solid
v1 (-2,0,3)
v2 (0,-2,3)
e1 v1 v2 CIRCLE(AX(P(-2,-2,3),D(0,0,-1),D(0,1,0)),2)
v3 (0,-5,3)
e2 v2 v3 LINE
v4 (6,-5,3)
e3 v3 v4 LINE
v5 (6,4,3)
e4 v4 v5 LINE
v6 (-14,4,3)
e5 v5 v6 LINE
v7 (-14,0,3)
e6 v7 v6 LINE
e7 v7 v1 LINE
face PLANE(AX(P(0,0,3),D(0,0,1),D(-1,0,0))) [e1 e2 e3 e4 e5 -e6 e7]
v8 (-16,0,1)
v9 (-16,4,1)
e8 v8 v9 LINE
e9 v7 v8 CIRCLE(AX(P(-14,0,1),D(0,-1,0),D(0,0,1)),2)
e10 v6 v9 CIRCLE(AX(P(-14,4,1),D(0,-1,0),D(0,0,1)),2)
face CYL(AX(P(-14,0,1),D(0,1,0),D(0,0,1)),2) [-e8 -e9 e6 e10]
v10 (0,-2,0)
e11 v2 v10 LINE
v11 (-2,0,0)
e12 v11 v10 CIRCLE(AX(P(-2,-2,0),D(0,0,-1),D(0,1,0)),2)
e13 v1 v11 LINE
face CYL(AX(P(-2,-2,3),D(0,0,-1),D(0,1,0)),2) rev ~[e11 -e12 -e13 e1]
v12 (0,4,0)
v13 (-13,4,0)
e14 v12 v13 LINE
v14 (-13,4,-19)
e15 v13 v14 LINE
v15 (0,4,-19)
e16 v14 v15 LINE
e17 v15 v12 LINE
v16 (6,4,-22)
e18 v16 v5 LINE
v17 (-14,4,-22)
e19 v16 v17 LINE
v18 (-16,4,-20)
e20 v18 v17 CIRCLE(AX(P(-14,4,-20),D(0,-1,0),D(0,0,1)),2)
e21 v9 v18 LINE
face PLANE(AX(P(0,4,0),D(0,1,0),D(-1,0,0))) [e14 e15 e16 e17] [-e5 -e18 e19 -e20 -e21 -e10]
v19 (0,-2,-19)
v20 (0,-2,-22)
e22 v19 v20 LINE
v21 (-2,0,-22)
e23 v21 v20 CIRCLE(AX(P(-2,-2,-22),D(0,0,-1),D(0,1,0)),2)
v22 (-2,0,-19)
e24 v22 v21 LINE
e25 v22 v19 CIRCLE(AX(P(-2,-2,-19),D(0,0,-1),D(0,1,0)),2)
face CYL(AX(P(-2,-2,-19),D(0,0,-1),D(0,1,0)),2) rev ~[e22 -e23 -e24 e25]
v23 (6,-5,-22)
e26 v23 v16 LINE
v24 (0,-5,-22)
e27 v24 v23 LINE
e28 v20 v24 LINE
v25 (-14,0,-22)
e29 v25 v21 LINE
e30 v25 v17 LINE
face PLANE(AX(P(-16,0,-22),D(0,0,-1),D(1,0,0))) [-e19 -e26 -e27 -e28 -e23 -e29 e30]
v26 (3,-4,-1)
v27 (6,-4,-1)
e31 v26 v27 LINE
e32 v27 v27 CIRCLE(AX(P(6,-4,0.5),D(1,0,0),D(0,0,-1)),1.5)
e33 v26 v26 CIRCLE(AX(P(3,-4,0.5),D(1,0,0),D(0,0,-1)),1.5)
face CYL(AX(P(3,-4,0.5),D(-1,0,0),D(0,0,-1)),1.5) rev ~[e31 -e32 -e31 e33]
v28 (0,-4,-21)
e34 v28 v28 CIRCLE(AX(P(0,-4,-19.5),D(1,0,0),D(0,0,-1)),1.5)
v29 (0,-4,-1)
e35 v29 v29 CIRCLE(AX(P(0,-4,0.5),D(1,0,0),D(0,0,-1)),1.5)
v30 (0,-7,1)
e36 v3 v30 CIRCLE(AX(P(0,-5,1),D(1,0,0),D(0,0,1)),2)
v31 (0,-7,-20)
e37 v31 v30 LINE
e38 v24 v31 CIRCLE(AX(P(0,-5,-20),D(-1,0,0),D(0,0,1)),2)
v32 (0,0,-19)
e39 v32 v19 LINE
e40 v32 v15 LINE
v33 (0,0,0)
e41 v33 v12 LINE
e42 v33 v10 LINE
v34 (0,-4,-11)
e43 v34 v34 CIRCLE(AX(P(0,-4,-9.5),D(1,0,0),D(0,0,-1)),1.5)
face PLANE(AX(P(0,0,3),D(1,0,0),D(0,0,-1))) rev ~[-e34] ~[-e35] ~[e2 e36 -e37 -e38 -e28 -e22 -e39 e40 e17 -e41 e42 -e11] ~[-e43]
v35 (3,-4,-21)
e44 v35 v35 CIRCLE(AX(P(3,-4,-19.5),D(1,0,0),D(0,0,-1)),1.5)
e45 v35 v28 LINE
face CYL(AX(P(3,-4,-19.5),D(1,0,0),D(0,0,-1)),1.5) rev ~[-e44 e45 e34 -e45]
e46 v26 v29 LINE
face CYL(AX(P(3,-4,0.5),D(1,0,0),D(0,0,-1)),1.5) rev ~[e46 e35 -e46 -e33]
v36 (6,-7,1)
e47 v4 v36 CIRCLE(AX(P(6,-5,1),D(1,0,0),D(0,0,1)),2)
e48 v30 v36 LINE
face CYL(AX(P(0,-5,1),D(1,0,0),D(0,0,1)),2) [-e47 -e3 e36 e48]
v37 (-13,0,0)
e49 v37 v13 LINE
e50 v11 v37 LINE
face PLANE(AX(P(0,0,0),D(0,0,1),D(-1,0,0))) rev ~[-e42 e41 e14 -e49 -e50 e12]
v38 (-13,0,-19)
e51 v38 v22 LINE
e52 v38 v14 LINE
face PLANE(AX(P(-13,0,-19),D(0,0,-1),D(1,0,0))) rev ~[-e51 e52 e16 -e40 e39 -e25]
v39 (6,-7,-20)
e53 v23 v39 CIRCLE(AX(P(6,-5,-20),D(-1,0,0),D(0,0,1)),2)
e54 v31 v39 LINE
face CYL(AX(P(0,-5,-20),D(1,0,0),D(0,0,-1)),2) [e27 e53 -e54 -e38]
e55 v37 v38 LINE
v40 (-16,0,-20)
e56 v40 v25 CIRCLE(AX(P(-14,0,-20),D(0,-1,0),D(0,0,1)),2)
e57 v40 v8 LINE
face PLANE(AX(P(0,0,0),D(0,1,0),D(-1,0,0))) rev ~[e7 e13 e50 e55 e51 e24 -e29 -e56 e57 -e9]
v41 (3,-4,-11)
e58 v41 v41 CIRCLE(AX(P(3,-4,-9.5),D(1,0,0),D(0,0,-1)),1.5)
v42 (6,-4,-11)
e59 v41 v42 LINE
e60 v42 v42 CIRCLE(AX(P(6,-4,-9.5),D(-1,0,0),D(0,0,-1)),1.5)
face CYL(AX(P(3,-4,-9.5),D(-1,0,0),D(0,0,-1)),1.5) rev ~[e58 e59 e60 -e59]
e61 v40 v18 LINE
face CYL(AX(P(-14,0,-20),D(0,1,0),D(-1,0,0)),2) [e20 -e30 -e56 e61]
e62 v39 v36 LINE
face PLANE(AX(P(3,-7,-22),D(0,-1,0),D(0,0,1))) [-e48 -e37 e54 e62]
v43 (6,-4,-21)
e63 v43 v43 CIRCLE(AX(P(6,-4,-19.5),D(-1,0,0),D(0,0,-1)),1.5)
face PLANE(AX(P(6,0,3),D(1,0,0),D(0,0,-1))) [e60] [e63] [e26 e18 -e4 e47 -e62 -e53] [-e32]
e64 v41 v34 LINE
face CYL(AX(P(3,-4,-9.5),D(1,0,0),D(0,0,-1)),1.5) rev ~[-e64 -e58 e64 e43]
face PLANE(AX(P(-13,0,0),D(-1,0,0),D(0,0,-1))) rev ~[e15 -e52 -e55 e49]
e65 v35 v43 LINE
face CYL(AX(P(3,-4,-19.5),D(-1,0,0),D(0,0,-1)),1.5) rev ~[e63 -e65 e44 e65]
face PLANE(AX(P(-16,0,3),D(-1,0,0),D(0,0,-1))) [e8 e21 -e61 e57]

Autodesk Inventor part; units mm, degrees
ref_plane "YZ Plane" through (0, 0, 0) normal (1, 0, 0) x (0, 1, 0)
ref_plane "XZ Plane" through (0, 0, 0) normal (0, 1, 0) x (-1, 0, 0)
ref_plane "XY Plane" through (0, 0, 0) normal (0, 0, 1) x (1, 0, 0)
sketch "Sketch1" plane through (0, 0, 0) normal (0, 1, 0) x (-1, 0, 0)
  line L0 (0, 0) -> (13, 0)
  line L1 (13, 0) -> (13, -19)
  line L2 (13, -19) -> (0, -19)
  line L3 (0, -19) -> (0, 0)
  line L4 (0, 0) -> (-3, 0)
  line L5 (-3, 0) -> (-3, 3)
  line L6 (-3, 3) -> (0, 3)
  line L7 (0, 3) -> (0, 0)
  line L8 (13, -19) -> (16, -19)
  line L9 (16, -19) -> (16, -22)
  line L10 (16, -22) -> (13, -22)
  line L11 (13, -22) -> (13, -19)
  line L12 (16, -22) -> (-3, -22)
  line L13 (-3, -22) -> (-3, 3)
  line L14 (-3, 3) -> (16, 3)
  line L15 (16, 3) -> (16, -22)
  dimension "d0" = 13
  dimension "d1" = 19
  dimension "d2" = 3
  dimension "d3" = 3
  dimension "d4" = 3
  dimension "d5" = 3
extrude "Extrusion1" add sketch "Sketch1" along normal blind 4 contours L7 L14 L15 L8 L1 L0 | L3 L2 L11 L12 L13 L4 | L4 L5 L6 L7 | L8 L9 L10 L11
sketch "Sketch2" plane through (3, 0, 3) normal (1, 0, 0) x (0, 0, -1)
  line L0 (25, 0) -> (25, 4) projected
  line L1 (25, 0) -> (0, 0) projected
  line L2 (25, 0) -> (0, 0)
  line L3 (25, 0) -> (12.5, 0)
  line L4 (3, 0) -> (22, 0) projected
  line L5 (12.5, 0) -> (12.5, -4)
  circle A0 centre (12.5, -4) radius 1.5
  line L6 (12.5, -4) -> (22.5, -4)
  line L7 (22.5, -4) -> (2.5, -4)
  circle A1 centre (2.5, -4) radius 1.5
  circle A2 centre (22.5, -4) radius 1.5
  line L8 (0, 0) -> (25, 0)
  line L9 (25, 0) -> (25, -7)
  line L10 (25, -7) -> (0, -7)
  line L11 (0, -7) -> (0, 0)
  line L12 (25, 0) -> (25, 4) projected
  line L13 (0, 0) -> (25, 0)
  line L14 (25, 0) -> (25, 4)
  line L15 (25, 4) -> (0, 4)
  line L16 (0, 4) -> (0, 0)
  dimension "d8" = 12.5
  dimension "d9" = 4
  dimension "d10" = 3
  dimension "d11" = 10
  dimension "d12" = 20
  dimension "d13" = 3
  dimension "d14" = 3
  dimension "d15" = 7
extrude "Extrusion2" add sketch "Sketch2" along normal mid plane 6
fillet "Fillet1" radius 2 4 edges at (-16, 2, -22) (-16, 2, 3) (3, -7, 3) (3, -7, -22)
fillet "Fillet2" radius 2 2 edges at (0, 0, -20.5) (0, 0, 1.5)
sketch "Sketch3" plane through (0, 4, 0) normal (0, 1, 0) x (1, 0, 0)
  point P0 (0, 0)
properties part number "power_button_holder"
